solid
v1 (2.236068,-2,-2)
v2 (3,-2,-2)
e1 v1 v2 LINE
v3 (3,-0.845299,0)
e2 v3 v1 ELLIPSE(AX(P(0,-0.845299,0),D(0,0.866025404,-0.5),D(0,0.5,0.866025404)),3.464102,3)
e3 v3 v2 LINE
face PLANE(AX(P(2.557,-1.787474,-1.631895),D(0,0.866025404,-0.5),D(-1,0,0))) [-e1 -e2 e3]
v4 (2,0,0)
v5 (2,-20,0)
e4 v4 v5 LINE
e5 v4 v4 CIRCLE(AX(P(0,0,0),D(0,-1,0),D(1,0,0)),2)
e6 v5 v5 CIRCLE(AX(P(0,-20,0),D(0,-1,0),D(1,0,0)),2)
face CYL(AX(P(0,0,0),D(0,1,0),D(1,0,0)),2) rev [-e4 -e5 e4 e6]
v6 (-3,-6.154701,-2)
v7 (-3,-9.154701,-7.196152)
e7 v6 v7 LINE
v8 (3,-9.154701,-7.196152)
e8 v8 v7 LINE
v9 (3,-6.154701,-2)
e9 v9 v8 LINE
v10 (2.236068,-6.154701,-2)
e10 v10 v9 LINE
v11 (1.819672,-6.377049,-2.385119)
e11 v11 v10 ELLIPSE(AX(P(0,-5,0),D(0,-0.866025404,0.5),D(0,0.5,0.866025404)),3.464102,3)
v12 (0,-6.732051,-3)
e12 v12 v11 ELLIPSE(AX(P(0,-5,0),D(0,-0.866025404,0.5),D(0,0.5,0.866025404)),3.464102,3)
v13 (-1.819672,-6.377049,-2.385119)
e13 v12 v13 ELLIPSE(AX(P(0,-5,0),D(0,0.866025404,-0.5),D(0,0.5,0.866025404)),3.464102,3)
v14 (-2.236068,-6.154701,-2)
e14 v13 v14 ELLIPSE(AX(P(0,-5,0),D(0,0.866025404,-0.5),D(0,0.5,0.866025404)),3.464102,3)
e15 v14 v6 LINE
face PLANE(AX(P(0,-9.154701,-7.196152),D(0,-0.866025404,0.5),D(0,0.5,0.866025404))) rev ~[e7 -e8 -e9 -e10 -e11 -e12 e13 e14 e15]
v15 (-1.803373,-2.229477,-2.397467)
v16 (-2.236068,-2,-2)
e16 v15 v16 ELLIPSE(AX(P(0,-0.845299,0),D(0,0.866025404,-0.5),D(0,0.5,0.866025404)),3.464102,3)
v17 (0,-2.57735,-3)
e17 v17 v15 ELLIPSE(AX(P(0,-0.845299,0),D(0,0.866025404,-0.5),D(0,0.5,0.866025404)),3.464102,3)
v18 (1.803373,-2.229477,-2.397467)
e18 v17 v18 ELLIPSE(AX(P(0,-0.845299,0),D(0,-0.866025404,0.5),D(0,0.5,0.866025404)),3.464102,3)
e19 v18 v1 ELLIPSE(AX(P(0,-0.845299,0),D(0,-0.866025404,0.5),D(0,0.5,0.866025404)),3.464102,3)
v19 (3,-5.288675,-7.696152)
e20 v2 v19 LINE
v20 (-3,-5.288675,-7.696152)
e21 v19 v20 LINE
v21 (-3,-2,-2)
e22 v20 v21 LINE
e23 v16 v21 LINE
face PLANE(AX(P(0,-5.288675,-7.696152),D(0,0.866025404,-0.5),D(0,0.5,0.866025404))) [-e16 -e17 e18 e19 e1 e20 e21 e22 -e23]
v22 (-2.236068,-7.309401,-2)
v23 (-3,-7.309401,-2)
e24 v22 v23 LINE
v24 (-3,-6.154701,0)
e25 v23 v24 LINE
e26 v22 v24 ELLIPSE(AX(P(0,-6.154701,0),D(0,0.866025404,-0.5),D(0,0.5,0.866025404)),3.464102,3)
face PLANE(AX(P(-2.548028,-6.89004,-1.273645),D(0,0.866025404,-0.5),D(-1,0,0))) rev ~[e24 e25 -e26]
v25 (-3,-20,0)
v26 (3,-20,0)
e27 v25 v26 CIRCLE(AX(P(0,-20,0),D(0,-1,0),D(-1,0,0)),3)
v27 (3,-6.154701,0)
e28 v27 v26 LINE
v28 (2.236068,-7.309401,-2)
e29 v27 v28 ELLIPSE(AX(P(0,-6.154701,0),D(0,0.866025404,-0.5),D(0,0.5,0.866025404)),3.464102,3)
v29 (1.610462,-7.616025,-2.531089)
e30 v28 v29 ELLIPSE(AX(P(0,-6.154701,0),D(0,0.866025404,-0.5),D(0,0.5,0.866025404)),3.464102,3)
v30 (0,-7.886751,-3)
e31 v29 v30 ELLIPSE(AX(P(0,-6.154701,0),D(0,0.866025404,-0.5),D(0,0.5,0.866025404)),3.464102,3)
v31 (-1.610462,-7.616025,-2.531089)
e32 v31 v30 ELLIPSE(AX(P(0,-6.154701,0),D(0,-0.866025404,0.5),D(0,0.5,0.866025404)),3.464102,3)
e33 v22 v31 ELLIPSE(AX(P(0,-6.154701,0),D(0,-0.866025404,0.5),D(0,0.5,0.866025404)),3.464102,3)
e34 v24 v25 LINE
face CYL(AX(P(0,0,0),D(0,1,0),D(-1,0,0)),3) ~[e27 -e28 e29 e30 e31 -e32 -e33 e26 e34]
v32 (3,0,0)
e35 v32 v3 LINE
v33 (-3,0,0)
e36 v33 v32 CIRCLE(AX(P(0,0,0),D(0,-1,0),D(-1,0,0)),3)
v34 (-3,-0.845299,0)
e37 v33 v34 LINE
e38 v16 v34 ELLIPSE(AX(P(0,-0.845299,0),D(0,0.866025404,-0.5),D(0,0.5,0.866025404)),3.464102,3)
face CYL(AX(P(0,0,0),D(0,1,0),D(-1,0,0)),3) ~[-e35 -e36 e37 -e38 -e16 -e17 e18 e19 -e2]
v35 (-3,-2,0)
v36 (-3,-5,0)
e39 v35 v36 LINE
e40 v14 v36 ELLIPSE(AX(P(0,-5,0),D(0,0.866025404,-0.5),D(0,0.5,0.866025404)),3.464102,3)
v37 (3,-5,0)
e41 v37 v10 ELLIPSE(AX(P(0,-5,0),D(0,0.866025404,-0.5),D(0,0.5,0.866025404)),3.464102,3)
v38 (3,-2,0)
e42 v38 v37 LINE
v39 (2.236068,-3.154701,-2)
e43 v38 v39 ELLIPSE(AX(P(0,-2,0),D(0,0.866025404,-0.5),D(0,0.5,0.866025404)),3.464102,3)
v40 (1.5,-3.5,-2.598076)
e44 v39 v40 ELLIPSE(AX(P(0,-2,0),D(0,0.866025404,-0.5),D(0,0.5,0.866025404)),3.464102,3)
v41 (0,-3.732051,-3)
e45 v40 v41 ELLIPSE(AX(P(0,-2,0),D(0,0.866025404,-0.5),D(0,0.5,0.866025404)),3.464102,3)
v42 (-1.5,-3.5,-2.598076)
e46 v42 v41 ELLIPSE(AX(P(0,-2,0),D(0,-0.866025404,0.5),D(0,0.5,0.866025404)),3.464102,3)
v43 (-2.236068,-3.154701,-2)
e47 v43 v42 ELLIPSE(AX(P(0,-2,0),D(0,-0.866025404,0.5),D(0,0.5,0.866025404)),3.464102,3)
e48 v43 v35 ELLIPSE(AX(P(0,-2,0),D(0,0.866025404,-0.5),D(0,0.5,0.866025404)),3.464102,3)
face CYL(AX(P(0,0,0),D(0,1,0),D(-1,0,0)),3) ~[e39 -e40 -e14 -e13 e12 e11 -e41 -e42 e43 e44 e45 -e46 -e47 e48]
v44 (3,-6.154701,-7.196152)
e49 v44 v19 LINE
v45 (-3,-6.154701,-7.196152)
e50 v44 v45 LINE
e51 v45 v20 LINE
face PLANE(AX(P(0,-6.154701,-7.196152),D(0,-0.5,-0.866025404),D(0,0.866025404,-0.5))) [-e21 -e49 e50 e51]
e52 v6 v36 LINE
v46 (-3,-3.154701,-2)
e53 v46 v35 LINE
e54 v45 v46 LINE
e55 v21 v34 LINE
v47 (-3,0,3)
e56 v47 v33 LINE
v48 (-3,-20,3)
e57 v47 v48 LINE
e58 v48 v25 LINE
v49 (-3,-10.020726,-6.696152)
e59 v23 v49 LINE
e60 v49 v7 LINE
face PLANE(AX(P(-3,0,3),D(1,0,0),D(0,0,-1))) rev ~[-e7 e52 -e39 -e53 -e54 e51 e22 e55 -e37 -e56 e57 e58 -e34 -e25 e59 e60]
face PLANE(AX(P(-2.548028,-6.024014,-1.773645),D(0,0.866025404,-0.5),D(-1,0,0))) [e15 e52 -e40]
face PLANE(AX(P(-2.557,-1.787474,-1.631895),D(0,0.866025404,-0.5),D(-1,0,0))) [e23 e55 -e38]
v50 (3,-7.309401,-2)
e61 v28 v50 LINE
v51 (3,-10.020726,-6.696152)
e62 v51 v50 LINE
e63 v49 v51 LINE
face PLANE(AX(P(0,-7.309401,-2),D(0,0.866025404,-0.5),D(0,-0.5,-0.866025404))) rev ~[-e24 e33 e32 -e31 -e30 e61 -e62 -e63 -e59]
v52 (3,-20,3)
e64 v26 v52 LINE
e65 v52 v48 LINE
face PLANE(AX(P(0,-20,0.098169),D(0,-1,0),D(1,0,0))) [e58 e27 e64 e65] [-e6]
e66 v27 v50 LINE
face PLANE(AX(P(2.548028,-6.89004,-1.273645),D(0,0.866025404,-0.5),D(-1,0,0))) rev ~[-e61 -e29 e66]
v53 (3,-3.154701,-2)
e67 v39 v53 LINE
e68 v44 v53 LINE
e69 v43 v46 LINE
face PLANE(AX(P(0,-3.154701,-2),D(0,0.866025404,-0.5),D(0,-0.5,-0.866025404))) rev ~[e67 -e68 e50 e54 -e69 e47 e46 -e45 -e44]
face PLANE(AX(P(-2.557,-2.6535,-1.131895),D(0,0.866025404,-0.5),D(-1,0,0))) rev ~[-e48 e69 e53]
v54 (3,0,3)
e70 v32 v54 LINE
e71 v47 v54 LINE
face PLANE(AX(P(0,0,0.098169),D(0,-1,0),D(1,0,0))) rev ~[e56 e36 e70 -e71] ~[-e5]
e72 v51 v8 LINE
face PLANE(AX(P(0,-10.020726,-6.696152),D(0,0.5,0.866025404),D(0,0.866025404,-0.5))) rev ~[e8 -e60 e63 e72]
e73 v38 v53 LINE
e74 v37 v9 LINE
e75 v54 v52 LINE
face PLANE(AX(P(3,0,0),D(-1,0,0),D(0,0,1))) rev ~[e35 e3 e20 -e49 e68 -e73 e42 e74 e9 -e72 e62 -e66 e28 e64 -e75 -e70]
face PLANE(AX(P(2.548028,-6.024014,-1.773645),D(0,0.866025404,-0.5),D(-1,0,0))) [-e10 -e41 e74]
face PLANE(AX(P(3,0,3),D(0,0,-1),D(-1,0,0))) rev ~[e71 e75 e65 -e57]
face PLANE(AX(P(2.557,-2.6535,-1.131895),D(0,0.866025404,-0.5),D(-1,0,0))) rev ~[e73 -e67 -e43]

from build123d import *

# Parameters (mm, degrees)
F0_R          = 2
F1_DEPTH      = 20
F3_DEPTH      = 3
F3_DEPTH_BACK = 3
F6_DEPTH      = 1
F9_DEPTH      = 1
F10_DEPTH     = 20


with BuildPart() as f1:
    # F0 (on Front) → F1 (new body)
    with BuildSketch(Plane.XZ):
        with BuildLine():
            ThreePointArc((-3, 0), (0, -3), (3, 0))
            ThreePointArc((3, 0), (2.1213203436, 2.1213203436), (0, 3))
            ThreePointArc((0, 3), (-2.1213203436, 2.1213203436), (-3, 0))
        make_face()
        Circle(F0_R, mode=Mode.SUBTRACT)
    extrude(amount=F1_DEPTH)

    # F2 (on Right) → F3 (join, two sides)
    with BuildSketch(Plane.YZ) as f3_sk:
        Polygon((-5.2886751346, -7.6961524227), (-2, -2), (-3.1547005384, -2), (-6.1547005384, -7.1961524227), align=None)
        Polygon((-9.1547005384, -7.1961524227), (-6.1547005384, -2), (-7.3094010768, -2), (-10.0207259422, -6.6961524227), align=None)
    extrude(amount=F3_DEPTH)
    extrude(f3_sk.sketch, amount=-F3_DEPTH_BACK)

    # F5 (on offset) → F6 (join)
    with BuildSketch(Plane(origin=(0, -0.6339745962, 0.3660254038), x_dir=(-1, 0, 0), z_dir=(0, 0.8660254038, -0.5))):
        Polygon((3, -4), (3, 0), (1.5, -4), align=None)
        Polygon((-1.5, -4), (-3, 0), (-3, -4), align=None)
    extrude(amount=-F6_DEPTH)

    # F8 (on offset) → F9 (join)
    with BuildSketch(Plane(origin=(0, -3.75, 2.1650635095), x_dir=(-1, 0, 0), z_dir=(0, 0.8660254038, -0.5))):
        Polygon((3, -6), (3, -2.5), (1.5, -6), align=None)
        Polygon((-3, -6), (-1.5, -6), (-3, -2.5), align=None)
    extrude(amount=-F9_DEPTH)

    # F0 (on Front) → F10 (join)
    with BuildSketch(Plane.XZ):
        with BuildLine():
            ThreePointArc((-3, 0), (0, -3), (3, 0))
            ThreePointArc((3, 0), (2.1213203436, 2.1213203436), (0, 3))
            ThreePointArc((0, 3), (-2.1213203436, 2.1213203436), (-3, 0))
        make_face()
        Circle(F0_R, mode=Mode.SUBTRACT)
        with BuildLine():
            ThreePointArc((0, 3), (2.1213203436, 2.1213203436), (3, 0))
            Line((3, 0), (3, 3))
            Line((3, 3), (0, 3))
        make_face()
        with BuildLine():
            ThreePointArc((-3, 0), (-2.1213203436, 2.1213203436), (0, 3))
            Line((0, 3), (-3, 3))
            Line((-3, 3), (-3, 0))
        make_face()
    extrude(amount=F10_DEPTH)


solid = f1.part
